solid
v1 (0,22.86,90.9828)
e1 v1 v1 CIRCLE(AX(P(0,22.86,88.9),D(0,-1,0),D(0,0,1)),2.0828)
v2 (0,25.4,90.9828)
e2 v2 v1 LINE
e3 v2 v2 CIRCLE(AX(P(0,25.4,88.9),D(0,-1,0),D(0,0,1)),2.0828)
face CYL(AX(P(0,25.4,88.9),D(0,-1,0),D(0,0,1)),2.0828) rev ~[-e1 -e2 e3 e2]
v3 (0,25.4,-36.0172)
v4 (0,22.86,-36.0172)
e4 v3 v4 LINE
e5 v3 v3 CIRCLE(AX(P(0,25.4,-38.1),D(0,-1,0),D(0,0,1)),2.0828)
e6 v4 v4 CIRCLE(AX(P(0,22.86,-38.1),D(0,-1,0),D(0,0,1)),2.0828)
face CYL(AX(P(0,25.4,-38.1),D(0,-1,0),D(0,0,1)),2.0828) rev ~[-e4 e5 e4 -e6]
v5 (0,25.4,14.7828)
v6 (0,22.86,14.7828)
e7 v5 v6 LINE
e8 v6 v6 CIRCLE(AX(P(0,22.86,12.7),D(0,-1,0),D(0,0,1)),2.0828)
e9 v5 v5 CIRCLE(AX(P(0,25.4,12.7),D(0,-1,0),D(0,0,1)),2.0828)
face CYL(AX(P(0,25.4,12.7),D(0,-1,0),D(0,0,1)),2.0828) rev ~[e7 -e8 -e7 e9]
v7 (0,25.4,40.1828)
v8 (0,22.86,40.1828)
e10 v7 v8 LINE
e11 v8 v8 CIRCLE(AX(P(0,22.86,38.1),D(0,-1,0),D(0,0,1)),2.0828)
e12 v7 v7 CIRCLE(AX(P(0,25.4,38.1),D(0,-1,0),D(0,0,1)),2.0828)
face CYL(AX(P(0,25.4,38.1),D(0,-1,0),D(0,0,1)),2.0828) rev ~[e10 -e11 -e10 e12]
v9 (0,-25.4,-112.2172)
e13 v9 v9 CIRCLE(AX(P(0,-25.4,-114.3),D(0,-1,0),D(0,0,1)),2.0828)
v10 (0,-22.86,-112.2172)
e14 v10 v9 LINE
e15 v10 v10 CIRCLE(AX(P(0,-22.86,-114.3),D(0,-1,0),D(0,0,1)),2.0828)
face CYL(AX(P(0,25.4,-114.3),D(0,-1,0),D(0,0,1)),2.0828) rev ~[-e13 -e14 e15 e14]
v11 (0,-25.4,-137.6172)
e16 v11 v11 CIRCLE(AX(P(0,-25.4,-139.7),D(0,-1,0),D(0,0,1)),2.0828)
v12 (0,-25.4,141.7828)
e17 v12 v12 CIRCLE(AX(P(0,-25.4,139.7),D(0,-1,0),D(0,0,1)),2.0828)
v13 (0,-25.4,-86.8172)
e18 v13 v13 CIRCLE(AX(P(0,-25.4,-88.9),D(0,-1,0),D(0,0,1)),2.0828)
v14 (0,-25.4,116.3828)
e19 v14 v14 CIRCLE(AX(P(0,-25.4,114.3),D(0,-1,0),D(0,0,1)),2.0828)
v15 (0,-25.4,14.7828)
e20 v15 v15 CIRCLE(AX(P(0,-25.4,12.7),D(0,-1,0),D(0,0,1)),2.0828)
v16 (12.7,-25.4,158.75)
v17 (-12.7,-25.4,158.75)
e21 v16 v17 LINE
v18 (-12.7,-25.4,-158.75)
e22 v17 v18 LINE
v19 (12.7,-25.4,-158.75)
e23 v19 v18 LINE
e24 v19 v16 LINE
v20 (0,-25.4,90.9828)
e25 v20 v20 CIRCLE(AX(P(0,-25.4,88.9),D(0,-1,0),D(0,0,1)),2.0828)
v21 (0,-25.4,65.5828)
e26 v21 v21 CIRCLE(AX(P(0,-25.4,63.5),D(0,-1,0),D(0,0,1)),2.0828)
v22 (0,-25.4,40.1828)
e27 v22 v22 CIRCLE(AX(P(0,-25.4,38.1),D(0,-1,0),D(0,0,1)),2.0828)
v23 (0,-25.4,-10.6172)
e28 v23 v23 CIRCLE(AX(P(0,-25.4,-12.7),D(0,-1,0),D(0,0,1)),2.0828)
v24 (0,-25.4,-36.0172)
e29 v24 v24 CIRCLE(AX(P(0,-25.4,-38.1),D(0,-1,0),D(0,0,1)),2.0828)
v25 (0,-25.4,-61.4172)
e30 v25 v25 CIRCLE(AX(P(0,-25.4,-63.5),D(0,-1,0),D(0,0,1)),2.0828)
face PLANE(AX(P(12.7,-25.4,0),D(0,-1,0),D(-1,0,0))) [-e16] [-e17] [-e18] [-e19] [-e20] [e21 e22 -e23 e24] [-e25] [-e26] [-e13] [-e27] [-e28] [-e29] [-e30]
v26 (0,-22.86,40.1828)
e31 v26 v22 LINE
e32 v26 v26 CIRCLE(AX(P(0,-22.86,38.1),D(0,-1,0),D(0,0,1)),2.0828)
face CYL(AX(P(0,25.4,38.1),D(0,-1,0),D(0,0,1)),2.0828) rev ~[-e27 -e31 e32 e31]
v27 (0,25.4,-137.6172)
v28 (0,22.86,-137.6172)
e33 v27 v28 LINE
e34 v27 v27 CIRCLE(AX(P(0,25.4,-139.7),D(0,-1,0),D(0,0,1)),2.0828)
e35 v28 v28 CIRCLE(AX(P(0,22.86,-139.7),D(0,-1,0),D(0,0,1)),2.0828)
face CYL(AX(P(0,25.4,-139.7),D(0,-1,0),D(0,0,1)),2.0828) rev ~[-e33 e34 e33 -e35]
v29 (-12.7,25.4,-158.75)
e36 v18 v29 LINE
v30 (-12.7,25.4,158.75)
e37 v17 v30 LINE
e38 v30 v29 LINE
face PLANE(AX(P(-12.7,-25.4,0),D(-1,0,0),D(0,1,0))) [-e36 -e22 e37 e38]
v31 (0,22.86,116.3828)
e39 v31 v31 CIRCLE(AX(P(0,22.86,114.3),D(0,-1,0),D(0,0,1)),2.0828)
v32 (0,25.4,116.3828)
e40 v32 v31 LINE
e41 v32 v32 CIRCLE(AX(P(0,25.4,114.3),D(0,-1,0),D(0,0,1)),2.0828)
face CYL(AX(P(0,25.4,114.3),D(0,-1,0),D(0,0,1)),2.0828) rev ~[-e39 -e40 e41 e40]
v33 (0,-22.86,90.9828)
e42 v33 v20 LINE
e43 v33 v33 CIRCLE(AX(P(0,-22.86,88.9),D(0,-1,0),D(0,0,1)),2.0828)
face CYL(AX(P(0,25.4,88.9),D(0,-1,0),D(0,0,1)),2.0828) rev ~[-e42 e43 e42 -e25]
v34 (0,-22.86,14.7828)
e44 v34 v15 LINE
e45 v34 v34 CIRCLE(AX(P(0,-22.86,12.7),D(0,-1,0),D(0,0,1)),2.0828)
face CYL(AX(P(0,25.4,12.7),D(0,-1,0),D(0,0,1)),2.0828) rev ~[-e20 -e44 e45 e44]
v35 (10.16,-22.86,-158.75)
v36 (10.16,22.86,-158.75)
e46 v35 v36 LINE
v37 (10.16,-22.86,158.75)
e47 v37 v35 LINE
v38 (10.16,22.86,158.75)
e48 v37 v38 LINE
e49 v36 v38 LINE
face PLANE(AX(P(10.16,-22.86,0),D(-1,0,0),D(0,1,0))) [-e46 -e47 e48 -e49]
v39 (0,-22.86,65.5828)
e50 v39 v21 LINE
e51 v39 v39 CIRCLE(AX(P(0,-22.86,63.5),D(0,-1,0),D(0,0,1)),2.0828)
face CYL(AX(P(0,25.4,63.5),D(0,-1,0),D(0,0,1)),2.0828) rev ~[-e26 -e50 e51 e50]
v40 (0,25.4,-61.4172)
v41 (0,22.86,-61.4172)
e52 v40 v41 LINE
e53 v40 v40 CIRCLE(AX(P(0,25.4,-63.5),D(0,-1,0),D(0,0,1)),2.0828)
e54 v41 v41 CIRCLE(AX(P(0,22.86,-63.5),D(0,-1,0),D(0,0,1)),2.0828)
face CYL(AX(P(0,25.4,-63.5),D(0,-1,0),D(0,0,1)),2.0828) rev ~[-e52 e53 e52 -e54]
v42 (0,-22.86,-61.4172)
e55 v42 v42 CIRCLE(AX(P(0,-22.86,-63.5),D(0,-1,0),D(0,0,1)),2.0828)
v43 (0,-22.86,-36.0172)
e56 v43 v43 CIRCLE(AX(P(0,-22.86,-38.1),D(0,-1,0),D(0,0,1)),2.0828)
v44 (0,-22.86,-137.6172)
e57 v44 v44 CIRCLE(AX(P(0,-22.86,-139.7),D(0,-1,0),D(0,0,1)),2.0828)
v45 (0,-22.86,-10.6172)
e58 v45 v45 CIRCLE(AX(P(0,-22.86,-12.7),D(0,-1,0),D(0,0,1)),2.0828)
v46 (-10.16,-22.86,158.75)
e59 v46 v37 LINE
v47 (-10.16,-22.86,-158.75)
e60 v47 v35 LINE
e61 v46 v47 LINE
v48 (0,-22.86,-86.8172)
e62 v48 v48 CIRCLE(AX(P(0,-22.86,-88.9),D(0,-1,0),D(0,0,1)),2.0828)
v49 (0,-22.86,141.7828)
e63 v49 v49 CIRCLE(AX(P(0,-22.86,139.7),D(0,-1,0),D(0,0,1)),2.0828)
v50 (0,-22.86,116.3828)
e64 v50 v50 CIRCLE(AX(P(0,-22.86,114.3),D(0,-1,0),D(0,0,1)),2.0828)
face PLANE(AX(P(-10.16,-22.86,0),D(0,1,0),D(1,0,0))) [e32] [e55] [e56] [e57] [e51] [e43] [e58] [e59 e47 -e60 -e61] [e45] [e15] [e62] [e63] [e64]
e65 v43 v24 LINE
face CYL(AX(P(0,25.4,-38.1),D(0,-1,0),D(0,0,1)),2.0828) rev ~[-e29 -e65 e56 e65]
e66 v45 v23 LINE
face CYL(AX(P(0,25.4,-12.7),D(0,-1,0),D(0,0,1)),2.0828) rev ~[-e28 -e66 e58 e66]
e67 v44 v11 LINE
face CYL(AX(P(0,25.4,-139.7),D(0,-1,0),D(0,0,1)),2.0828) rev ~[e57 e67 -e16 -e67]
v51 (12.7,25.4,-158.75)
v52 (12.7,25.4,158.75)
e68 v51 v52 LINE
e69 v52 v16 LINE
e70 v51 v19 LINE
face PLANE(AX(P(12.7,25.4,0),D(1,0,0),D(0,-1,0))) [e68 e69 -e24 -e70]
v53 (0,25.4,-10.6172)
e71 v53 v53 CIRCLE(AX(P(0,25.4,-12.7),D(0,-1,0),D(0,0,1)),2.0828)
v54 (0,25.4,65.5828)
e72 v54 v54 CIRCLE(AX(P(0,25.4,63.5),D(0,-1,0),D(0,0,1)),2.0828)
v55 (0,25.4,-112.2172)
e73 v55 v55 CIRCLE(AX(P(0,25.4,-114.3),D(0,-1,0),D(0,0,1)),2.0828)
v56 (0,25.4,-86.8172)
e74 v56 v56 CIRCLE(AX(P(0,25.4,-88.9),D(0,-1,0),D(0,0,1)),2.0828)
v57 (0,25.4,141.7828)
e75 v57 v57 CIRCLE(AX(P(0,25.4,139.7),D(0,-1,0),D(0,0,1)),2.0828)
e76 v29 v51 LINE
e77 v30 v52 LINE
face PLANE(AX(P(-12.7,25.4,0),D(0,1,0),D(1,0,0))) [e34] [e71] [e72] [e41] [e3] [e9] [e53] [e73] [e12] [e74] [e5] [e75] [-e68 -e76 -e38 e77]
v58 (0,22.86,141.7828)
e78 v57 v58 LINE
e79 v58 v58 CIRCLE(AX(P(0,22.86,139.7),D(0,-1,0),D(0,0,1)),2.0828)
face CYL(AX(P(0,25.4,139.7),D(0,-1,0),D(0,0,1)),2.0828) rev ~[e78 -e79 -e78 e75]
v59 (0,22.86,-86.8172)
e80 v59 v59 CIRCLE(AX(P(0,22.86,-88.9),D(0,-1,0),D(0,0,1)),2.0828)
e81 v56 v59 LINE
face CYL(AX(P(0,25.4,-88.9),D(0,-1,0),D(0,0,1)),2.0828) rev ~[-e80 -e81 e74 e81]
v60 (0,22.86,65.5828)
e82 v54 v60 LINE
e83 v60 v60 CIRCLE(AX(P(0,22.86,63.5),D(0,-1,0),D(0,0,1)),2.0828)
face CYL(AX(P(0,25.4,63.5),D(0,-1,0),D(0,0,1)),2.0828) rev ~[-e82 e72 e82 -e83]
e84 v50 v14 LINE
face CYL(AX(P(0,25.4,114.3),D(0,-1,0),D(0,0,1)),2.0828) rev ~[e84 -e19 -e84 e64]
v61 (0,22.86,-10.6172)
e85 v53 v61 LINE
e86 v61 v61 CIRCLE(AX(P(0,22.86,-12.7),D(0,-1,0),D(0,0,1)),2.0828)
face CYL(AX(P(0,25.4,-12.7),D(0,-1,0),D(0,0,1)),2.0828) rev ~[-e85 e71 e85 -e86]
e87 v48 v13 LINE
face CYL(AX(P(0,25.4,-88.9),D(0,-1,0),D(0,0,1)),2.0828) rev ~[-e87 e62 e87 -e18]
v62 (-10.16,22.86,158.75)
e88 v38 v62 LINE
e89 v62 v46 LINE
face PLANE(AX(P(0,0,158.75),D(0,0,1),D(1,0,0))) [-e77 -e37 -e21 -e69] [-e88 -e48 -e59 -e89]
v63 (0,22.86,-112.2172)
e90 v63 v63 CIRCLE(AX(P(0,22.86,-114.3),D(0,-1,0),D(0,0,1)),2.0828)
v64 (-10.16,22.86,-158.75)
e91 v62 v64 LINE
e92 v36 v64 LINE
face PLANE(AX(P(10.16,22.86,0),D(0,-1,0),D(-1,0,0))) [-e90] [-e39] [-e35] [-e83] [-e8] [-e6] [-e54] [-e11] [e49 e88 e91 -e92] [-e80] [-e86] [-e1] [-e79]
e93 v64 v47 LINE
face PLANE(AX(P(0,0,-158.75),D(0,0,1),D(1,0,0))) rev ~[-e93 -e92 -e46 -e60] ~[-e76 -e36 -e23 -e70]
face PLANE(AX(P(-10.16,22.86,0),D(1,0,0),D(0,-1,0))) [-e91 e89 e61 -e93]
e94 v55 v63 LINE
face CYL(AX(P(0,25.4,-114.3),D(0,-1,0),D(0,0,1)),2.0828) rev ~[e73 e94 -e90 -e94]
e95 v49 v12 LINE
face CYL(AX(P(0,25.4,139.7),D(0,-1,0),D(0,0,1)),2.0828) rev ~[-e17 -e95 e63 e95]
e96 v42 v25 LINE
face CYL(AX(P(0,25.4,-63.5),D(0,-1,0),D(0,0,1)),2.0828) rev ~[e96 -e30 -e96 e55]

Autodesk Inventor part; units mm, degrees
ref_plane "YZ Plane" through (0, 0, 0) normal (1, 0, 0) x (0, 1, 0)
ref_plane "XZ Plane" through (0, 0, 0) normal (0, 1, 0) x (-1, 0, 0)
ref_plane "XY Plane" through (0, 0, 0) normal (0, 0, 1) x (1, 0, 0)
sketch "Sketch1" plane through (0, 0, 0) normal (0, 0, 1) x (1, 0, 0)
  line L0 (12.7, -25.4) -> (-12.7, -25.4)
  line L1 (-12.7, -25.4) -> (-12.7, 25.4)
  line L2 (-12.7, 25.4) -> (12.7, 25.4)
  line L3 (12.7, 25.4) -> (12.7, -25.4)
  line L4 (12.7, -25.4) -> (-12.7, 25.4) construction
  line L5 (-12.7, -25.4) -> (12.7, 25.4) construction
  line L6 (10.16, 22.86) -> (-10.16, 22.86)
  line L7 (-10.16, 22.86) -> (-10.16, -22.86)
  line L8 (-10.16, -22.86) -> (10.16, -22.86)
  line L9 (10.16, -22.86) -> (10.16, 22.86)
  point P0 (0, 0)
  dimension "d0" = 25.4
  dimension "d1" = 50.8
  dimension "d2" = 2.54
extrude "Extrusion1" add sketch "Sketch1" along normal mid plane 317.5
sketch "Sketch2" plane through (-12.7, 25.4, 158.75) normal (0, 1, 0) x (1, 0, 0)
  point P0 (12.7, 158.75)
  point P1 (12.7, 171.45)
  point P2 (12.7, 146.05)
  dimension "HoleOffset" = 12.7
  dimension "d6" = 12.7
hole "Hole1" at (0, 25.4, -12.7) at (0, 25.4, 12.7) direction (0, -1, 0) diameter 4.1656 end through all
pattern_linear "Rectangular Pattern1" count 31 spacing 50.8 along (0, 0, 1) of "Hole1" first direction both ways yes
properties part number "VersaFrame Side Rail" material "Aluminum 6061"
